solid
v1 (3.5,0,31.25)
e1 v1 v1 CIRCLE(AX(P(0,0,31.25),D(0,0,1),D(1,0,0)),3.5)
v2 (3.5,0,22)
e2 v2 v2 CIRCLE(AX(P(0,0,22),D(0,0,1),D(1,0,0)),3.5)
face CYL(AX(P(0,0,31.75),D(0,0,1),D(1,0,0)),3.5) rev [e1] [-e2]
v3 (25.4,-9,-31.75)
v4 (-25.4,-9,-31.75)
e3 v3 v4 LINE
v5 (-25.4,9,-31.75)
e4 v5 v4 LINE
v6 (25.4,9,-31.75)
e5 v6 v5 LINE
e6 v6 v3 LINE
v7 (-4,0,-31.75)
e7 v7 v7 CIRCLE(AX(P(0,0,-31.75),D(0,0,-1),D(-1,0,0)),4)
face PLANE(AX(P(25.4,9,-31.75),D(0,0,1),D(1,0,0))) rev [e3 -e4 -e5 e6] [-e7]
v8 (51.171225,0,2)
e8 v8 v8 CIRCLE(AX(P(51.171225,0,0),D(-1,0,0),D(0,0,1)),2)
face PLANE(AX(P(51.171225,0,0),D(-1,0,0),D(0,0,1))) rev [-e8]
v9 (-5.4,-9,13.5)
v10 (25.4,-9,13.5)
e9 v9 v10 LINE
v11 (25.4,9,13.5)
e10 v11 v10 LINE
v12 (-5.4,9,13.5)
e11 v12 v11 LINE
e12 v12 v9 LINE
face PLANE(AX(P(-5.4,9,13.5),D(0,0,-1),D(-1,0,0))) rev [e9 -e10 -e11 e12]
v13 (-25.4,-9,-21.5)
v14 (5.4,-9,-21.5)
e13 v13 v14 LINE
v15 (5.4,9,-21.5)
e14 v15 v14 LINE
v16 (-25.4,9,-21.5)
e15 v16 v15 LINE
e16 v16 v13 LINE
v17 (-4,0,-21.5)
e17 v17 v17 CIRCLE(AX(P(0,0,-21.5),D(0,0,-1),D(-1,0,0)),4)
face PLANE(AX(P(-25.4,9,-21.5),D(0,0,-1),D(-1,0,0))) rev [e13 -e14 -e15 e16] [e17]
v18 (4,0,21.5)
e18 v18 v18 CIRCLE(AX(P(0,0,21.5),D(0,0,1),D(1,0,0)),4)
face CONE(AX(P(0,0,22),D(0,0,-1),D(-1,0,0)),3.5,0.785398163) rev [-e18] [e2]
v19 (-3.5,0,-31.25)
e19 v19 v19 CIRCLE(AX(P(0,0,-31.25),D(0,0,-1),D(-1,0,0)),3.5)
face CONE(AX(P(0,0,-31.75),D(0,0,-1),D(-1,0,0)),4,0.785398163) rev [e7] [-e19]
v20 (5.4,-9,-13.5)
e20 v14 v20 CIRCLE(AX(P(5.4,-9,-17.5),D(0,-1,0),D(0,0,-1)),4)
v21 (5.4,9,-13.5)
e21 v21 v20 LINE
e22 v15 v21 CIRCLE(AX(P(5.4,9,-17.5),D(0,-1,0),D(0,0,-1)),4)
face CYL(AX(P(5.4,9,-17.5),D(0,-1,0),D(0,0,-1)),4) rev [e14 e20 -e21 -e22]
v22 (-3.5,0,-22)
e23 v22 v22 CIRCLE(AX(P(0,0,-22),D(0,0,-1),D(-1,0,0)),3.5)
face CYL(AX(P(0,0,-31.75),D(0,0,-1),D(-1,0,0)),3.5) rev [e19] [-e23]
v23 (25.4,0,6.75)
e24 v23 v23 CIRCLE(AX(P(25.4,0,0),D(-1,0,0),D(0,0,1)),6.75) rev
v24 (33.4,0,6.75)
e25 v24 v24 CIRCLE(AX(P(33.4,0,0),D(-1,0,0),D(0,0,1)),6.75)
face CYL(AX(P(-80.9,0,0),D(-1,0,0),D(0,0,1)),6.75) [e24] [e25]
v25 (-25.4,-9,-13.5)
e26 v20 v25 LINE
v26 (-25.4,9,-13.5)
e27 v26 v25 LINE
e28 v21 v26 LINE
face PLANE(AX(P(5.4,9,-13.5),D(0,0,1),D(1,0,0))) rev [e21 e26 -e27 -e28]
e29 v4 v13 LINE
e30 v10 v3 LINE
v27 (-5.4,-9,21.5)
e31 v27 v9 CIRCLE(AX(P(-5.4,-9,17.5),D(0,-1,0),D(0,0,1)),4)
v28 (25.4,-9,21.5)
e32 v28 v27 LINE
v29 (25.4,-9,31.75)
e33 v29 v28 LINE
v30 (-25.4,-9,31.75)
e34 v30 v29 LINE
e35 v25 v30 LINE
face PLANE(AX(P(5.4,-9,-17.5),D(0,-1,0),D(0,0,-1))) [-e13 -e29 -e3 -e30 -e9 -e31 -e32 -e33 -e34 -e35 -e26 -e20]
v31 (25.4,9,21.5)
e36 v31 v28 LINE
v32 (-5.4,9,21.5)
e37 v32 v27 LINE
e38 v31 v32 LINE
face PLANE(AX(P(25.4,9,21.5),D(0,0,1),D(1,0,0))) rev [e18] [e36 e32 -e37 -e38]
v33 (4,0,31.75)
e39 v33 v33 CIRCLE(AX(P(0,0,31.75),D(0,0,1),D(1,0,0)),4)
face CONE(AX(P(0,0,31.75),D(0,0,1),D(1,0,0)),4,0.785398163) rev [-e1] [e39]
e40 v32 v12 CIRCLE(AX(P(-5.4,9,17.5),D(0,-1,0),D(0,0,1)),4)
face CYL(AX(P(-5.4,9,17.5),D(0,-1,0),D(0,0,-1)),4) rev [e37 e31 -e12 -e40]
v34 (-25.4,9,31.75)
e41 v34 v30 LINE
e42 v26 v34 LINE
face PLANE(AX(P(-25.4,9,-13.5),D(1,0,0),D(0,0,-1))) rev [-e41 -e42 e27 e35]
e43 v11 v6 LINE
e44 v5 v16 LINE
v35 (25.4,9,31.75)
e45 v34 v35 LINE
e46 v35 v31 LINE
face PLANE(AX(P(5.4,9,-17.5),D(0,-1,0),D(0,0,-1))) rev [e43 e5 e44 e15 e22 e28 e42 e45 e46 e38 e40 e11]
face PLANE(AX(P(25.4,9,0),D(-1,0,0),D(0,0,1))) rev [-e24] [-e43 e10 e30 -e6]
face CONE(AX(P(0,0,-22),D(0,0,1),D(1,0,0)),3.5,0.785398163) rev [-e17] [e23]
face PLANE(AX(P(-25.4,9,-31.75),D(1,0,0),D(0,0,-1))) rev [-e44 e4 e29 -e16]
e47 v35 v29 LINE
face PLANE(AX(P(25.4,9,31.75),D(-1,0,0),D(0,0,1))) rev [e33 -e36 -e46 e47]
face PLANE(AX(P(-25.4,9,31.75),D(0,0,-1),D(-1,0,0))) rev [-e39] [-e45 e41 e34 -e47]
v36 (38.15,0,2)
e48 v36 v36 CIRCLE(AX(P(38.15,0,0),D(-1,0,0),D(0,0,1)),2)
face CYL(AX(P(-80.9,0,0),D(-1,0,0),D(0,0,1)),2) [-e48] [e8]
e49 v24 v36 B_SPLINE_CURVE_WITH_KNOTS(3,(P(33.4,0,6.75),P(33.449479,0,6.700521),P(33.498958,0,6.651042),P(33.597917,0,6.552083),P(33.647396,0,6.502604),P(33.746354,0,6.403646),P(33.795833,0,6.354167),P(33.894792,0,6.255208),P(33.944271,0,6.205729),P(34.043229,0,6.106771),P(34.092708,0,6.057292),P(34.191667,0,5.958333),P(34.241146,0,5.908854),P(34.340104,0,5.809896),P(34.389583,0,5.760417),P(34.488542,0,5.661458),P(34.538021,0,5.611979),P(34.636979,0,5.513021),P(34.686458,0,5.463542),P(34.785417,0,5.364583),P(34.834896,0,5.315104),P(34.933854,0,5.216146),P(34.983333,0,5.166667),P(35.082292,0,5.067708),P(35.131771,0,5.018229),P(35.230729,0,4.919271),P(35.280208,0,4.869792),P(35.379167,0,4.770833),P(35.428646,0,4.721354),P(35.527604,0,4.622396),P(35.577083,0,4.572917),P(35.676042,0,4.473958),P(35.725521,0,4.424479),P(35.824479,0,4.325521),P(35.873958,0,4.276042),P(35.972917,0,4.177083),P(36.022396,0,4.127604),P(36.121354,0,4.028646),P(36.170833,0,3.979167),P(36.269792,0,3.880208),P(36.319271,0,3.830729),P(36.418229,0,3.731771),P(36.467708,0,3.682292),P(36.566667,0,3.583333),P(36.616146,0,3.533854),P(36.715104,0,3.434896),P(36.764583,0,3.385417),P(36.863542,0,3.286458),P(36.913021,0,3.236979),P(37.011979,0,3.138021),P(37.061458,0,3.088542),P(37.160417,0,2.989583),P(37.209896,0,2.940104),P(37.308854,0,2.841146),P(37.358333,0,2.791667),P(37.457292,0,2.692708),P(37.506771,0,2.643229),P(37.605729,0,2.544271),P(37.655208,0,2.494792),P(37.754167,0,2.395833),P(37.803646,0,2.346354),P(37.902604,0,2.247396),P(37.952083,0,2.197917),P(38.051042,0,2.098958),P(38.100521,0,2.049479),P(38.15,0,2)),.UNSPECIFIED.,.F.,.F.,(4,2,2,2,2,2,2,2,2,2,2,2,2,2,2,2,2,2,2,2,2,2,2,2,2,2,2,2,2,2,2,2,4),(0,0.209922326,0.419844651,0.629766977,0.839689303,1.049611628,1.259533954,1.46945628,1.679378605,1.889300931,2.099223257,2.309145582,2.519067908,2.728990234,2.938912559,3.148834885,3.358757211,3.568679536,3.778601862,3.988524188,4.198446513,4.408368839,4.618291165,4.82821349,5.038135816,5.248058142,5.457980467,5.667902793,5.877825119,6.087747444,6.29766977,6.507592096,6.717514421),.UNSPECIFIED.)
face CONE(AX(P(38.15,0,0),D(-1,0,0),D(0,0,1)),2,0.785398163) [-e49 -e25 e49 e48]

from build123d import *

# Parameters (mm, degrees)
BOSS_EXTRUDE1_DEPTH = 9
CIRPATTERN1_COUNT   = 2


# Read off the part's stored shape, not the designer's step: M8x1.0 Tapped Hole1
with BuildPart() as part:
    # Sketch1 → Boss-Extrude1 (new, symmetric)
    with BuildSketch(Plane(origin=(0, 0, 0), x_dir=(1, 0, 0), z_dir=(0, 1, 0))):
        with BuildLine():
            Line((-25.4, 0), (25.4, 0))
            Line((25.4, 0), (25.4, 31.75))
            Line((25.4, 31.75), (-25.4, 31.75))
            Line((-25.4, 31.75), (-25.4, 21.5))
            Line((-25.4, 21.5), (5.4, 21.5))
            ThreePointArc((5.4, 21.5), (9.4, 17.5), (5.4, 13.5))
            Line((5.4, 13.5), (-25.4, 13.5))
            Line((-25.4, 13.5), (-25.4, 0))
        make_face()
    boss_extrude1 = extrude(amount=BOSS_EXTRUDE1_DEPTH, both=True)

    # M8x1.0 Tapped Hole1 outline → M8x1.0 Tapped Hole1 (revolve, cut)
    with BuildSketch(Plane.XZ):
        Polygon((4, -21.5), (0, -21.5), (0, -31.75), (4, -31.75), (3.5, -31.25), (3.5, -22), align=None)
    m8x1_0_tapped_hole1 = revolve(axis=Axis((0, 0, 0), (0, 0, 1)), mode=Mode.SUBTRACT)

    # CirPattern1: Boss-Extrude1, M8x1.0 Tapped Hole1 ×2 about axis
    cirpattern1_axis = Axis((0, 0, 0), (0, 1, 0))
    add([boss_extrude1.rotate(cirpattern1_axis, i * 360 / CIRPATTERN1_COUNT) for i in range(1, CIRPATTERN1_COUNT)])
    add([m8x1_0_tapped_hole1.rotate(cirpattern1_axis, i * 360 / CIRPATTERN1_COUNT) for i in range(1, CIRPATTERN1_COUNT)], mode=Mode.SUBTRACT)

    # Sketch5 → Revolve1 (revolve)
    with BuildSketch(Plane(origin=(0, 0, 0), x_dir=(1, 0, 0), z_dir=(0, 1, 0)), mode=Mode.PRIVATE) as revolve1_sk:
        Polygon((25.4, 0), (51.171225178, 0), (51.171225178, 2), (38.15, 2), (33.4, 6.75), (25.4, 6.75), align=None)
    revolve(revolve1_sk.sketch.rotate(Axis((-80.9, 0, 0), (1, 0, 0)), 180), axis=Axis((-80.9, 0, 0), (1, 0, 0)))


solid = part.part
